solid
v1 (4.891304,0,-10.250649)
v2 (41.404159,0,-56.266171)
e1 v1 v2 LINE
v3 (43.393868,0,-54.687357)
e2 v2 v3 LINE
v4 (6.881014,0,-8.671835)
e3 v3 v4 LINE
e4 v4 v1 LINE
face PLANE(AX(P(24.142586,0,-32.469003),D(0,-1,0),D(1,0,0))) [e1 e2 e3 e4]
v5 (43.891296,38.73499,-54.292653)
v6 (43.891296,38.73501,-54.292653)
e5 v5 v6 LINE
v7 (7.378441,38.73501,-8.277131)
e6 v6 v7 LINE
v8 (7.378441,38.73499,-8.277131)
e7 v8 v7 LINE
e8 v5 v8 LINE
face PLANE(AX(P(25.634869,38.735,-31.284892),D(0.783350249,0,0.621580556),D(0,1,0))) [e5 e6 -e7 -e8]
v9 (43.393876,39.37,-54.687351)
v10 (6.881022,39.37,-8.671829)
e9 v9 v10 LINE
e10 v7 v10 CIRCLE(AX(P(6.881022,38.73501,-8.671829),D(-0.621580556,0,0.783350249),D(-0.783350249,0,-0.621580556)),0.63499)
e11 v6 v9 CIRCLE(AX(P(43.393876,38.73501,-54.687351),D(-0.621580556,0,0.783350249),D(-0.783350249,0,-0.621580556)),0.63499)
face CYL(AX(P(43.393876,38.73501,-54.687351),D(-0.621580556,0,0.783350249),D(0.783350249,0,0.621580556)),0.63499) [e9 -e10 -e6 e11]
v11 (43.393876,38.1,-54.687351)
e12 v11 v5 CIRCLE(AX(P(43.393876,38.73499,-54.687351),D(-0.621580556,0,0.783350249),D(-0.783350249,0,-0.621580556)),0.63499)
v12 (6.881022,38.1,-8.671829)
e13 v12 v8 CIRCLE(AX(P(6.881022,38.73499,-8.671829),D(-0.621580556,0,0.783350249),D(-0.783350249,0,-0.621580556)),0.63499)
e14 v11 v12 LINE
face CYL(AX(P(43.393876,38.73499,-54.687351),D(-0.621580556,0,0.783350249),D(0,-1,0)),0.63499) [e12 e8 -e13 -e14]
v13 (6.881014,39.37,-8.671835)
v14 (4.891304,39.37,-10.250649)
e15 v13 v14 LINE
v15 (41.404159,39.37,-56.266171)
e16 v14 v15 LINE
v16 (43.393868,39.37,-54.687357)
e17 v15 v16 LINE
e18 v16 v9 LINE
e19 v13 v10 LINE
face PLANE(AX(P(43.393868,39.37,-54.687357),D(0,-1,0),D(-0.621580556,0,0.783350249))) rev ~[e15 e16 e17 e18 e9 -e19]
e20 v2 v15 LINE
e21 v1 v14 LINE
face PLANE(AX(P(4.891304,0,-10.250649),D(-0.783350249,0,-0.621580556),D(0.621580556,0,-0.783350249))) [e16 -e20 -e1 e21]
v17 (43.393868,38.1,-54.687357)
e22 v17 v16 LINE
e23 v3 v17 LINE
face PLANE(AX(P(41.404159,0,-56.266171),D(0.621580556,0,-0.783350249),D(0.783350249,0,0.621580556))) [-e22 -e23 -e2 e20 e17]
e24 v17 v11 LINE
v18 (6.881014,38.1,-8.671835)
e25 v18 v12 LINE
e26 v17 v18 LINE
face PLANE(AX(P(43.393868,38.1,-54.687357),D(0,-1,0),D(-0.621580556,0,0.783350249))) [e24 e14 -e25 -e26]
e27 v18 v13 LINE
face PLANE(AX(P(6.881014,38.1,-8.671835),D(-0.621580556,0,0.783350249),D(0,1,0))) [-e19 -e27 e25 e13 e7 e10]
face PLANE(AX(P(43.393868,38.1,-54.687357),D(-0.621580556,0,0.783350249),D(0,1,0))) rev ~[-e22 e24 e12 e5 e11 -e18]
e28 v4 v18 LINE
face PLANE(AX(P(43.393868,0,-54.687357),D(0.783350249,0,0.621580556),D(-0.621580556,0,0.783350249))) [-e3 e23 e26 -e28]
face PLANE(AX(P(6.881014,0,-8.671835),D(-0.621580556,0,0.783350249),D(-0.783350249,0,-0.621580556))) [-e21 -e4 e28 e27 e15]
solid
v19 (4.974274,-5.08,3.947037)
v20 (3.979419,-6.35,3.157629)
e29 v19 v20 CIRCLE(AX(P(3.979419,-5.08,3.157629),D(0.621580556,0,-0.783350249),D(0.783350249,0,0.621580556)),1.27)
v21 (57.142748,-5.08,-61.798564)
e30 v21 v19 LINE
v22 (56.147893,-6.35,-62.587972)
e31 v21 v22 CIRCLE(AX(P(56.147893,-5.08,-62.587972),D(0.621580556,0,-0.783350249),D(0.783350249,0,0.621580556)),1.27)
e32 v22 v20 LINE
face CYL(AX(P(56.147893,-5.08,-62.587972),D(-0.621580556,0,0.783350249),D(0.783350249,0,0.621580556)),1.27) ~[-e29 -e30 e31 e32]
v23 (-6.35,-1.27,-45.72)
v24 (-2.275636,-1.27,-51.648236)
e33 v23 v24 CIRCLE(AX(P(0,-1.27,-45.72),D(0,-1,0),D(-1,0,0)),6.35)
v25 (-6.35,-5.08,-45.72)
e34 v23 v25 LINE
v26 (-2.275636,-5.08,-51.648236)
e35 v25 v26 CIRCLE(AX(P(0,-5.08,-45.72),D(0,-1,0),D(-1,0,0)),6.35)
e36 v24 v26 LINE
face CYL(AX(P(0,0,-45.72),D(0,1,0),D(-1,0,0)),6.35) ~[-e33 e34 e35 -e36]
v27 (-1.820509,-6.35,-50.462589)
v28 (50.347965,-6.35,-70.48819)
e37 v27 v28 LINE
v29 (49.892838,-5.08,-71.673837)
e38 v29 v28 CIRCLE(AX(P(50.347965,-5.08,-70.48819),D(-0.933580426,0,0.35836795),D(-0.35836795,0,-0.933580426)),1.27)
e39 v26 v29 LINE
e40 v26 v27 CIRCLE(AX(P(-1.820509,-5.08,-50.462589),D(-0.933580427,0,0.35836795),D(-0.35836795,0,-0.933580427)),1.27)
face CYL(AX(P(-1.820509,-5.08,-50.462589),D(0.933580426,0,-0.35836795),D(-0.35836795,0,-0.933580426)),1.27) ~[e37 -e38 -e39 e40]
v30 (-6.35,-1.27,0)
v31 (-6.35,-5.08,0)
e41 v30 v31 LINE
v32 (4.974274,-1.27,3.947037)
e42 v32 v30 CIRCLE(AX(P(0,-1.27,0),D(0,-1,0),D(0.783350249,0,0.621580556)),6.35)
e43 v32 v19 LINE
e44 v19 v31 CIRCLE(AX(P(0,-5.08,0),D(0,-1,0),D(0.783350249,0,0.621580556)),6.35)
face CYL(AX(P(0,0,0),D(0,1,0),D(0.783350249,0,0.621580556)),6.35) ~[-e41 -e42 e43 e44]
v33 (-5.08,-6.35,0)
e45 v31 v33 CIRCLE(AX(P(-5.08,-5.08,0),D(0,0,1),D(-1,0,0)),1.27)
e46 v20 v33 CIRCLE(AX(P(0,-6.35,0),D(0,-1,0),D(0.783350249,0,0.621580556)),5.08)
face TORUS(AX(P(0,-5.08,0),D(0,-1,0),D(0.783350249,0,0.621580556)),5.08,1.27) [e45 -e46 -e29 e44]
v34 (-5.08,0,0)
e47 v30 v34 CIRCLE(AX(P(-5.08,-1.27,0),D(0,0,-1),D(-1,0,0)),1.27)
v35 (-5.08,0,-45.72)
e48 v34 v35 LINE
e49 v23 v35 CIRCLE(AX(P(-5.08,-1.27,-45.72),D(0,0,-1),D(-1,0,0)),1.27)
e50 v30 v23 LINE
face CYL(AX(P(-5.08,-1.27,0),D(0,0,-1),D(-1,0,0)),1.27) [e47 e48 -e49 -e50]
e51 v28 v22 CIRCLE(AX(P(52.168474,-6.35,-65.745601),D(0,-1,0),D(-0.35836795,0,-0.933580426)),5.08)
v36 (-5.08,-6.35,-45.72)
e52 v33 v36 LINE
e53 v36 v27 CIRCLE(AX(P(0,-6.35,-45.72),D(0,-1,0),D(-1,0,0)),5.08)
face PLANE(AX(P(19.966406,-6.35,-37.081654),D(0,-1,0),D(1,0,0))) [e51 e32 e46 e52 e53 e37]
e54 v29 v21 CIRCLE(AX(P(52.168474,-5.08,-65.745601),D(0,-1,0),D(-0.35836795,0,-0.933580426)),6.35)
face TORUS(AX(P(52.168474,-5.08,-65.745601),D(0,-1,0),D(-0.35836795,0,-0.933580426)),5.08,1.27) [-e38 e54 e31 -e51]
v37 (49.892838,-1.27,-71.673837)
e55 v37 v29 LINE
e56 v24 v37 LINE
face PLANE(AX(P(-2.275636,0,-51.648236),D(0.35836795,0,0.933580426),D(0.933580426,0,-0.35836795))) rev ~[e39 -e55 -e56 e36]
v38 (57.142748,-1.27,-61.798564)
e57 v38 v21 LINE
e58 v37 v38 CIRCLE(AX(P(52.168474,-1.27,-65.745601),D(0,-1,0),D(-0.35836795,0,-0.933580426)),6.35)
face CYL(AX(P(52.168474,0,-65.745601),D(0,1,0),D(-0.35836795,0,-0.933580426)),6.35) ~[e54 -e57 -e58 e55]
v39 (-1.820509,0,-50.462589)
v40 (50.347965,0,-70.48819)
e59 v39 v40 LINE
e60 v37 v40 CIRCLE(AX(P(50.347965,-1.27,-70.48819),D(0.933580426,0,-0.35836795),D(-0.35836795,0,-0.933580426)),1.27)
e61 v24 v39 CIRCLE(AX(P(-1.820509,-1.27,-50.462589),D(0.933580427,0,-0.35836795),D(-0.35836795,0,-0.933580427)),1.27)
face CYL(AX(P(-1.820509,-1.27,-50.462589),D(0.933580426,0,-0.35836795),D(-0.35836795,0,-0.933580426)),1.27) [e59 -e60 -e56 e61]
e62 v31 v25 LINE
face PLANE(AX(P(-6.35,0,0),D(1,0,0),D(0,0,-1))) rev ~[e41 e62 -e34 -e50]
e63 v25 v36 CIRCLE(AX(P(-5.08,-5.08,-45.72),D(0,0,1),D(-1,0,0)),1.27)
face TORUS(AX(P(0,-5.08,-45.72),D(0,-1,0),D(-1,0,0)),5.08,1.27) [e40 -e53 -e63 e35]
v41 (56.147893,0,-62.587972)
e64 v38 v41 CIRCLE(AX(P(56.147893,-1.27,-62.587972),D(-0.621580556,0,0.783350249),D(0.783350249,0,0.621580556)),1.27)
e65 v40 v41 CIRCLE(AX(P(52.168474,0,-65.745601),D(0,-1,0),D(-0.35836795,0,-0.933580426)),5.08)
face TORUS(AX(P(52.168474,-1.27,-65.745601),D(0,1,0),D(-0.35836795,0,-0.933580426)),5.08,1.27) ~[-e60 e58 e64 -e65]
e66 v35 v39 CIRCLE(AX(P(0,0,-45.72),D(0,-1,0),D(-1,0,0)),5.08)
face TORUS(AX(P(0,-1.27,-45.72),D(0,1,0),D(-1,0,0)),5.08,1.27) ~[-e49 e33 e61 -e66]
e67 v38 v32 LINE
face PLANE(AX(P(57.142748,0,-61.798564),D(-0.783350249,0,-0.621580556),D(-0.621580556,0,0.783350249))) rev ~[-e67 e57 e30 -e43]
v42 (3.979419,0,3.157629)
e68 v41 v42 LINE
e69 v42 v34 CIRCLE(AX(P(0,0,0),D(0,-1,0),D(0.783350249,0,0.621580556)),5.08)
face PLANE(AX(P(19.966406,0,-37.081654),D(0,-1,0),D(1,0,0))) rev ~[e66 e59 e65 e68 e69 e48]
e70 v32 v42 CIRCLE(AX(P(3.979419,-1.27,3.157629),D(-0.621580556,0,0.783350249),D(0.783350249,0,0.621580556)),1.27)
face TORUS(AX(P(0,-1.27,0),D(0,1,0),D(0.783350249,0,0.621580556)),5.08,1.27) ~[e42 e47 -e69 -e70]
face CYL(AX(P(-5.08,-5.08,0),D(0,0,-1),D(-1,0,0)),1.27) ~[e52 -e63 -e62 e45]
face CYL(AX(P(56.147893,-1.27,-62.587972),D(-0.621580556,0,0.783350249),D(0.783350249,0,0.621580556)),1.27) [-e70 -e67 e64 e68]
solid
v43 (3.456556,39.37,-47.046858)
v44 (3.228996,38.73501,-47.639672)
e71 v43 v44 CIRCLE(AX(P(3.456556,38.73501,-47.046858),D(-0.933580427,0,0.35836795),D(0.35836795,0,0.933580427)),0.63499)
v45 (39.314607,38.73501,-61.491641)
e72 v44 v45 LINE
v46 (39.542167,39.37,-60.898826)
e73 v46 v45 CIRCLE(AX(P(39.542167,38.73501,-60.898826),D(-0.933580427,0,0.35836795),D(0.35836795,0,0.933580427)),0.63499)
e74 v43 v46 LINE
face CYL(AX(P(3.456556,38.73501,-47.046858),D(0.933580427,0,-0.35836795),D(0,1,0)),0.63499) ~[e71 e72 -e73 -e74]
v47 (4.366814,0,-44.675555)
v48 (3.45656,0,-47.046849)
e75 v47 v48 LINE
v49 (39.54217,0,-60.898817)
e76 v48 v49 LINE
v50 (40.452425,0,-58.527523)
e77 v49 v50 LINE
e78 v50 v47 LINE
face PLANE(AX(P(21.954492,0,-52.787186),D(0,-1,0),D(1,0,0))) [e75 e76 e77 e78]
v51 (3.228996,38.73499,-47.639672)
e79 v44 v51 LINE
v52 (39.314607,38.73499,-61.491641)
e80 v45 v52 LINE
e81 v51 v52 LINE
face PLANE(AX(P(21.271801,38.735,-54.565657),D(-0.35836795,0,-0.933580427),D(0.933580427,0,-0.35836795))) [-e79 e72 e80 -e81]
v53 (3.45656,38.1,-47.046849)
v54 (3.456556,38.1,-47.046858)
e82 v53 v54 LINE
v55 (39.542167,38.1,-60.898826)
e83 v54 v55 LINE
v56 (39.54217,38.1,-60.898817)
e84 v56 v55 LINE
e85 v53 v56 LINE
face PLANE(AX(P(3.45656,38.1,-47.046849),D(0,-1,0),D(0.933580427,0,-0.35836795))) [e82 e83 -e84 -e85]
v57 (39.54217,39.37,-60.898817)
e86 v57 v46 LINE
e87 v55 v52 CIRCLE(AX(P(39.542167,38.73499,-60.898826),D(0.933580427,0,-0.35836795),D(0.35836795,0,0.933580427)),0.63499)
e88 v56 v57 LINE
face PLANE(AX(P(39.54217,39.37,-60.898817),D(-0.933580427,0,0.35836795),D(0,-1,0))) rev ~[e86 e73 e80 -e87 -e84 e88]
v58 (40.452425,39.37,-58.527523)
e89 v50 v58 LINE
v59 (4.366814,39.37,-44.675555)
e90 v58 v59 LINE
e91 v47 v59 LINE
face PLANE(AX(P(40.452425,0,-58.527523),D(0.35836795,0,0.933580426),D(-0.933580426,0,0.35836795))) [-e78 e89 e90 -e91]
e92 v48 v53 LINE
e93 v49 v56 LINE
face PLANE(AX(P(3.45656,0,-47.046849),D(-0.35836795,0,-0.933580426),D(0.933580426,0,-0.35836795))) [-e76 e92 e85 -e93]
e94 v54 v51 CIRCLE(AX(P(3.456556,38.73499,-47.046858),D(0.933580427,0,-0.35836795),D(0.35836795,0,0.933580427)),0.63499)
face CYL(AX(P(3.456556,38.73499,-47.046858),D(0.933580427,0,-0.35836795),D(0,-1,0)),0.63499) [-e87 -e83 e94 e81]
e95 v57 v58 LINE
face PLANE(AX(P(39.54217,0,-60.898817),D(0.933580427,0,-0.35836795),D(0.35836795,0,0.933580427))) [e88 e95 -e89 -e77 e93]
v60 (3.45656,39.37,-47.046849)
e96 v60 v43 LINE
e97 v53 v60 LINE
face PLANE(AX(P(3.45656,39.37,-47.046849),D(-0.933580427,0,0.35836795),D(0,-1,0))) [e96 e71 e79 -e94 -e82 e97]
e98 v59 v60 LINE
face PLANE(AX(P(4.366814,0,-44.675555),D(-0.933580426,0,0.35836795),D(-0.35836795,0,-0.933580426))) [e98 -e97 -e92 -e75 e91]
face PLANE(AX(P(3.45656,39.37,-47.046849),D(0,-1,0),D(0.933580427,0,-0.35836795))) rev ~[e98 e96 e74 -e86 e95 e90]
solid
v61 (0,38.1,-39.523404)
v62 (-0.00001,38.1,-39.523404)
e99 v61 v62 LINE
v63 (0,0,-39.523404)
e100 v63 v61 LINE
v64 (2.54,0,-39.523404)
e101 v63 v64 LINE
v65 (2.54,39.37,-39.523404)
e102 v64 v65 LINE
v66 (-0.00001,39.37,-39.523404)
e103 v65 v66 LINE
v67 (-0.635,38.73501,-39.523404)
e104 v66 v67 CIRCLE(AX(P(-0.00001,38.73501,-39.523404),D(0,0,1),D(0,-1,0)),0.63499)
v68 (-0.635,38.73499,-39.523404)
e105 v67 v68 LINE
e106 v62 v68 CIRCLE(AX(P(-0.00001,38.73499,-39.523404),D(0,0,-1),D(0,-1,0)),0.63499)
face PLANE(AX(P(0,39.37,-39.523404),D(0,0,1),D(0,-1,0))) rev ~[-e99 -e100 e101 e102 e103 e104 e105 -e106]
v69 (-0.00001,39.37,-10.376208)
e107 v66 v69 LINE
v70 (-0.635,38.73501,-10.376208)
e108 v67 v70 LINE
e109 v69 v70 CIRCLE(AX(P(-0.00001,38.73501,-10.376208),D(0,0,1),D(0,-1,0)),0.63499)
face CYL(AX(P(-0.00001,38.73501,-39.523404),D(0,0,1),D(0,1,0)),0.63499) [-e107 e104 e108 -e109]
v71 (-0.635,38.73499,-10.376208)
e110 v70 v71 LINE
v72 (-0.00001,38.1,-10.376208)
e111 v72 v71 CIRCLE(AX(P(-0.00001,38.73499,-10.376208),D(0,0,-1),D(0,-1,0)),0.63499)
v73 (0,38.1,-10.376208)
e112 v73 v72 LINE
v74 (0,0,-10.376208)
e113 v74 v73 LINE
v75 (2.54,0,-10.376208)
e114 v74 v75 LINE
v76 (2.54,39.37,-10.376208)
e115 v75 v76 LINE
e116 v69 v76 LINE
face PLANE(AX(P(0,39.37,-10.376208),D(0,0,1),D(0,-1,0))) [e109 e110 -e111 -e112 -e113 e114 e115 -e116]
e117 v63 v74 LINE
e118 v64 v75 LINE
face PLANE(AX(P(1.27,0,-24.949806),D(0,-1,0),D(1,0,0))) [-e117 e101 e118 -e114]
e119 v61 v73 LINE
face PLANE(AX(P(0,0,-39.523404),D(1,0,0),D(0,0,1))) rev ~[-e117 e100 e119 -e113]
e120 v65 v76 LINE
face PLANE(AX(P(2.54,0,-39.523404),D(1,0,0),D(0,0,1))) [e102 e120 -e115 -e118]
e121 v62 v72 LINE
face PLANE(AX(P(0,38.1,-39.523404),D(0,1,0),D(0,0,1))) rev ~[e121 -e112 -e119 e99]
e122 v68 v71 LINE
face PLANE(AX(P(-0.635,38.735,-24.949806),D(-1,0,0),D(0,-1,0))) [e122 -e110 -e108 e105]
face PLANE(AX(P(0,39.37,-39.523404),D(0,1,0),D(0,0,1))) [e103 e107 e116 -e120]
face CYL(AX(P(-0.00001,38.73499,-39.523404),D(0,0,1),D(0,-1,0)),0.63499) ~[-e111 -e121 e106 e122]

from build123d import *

# Parameters (mm, degrees)
F0_W      = 2.54
F0_H      = 29.1471965611
F1_DEPTH  = 6.35
F2_DEPTH  = 39.37
F3_W      = 1.27
F3_H      = 58.7419511778
F4_DEPTH  = 0.635
F5_R      = 0.63499
F6_W      = 38.6529213808
F6_H      = 1.27
F7_DEPTH  = 0.635
F8_R      = 0.63499
F9_W      = 1.27
F9_H      = 29.1471965611
F10_DEPTH = 0.635
F11_R     = 0.63499
F12_R     = 1.27


# Not quite as in the source:
# - a fillet or chamfer is up to 0.001 mm smaller than in the source, because OpenCascade refuses the exact size


with BuildPart() as f1:
    # F0 (on Front) → F1 (new body)
    with BuildSketch(Plane.XZ):
        with BuildLine():
            Line((57.1427482982, -61.7985644783), (4.9742740829, 3.9470365205))
            ThreePointArc((4.9742740829, 3.9470365205), (-2.0899592777, 5.9962129759), (-6.3499999957, -1.22e-08))
            Line((-6.3499999957, -1.22e-08), (-6.3499999957, -45.7199999971))
            ThreePointArc((-6.3499999957, -45.7199999971), (-5.2332012935, -49.3166796015), (-2.2756364753, -51.6482357053))
            Line((-2.2756364754, -51.6482357053), (49.89283774, -71.6738367193))
            ThreePointArc((49.89283774, -71.6738367193), (57.2871568315, -69.5034711949), (57.1427482982, -61.7985644783))
        make_face()
        Polygon((0, -10.3762075305), (0, 0), (6.8810137765, -8.6718347243), (43.39386847, -54.6873567827), (52.1684742327, -65.7456010206), (39.5421703506, -60.8988170648), (3.4565595225, -47.0468488857), (0, -45.72), (0, -39.5234040916), align=None, mode=Mode.SUBTRACT)
        Polygon((6.8810137765, -8.6718347243), (0, 0), (0, -10.3762075305), (2.54, -10.3762075305), (2.54, -39.5234040916), (0, -39.5234040916), (0, -45.72), (3.4565595225, -47.0468488857), (4.3668141144, -44.6755546023), (40.4524249424, -58.5275227815), (39.5421703506, -60.8988170648), (52.1684742327, -65.7456010206), (43.39386847, -54.6873567827), (41.4041588386, -56.2661713958), (4.891304145, -10.2506493374), align=None)
        with Locations((1.27, -24.949805811)):
            Rectangle(F0_W, F0_H)
        Polygon((43.39386847, -54.6873567827), (6.8810137765, -8.6718347243), (4.891304145, -10.2506493374), (41.4041588386, -56.2661713958), align=None)
        Polygon((4.3668141144, -44.6755546023), (3.4565595225, -47.0468488857), (39.5421703506, -60.8988170648), (40.4524249424, -58.5275227815), align=None)
    extrude(amount=F1_DEPTH)

    # F12
    f12_edges = [f1.edges().sort_by_distance(p)[0] for p in [
        (-6.35, -6.35, -22.86),
        (-6.35, 0, -22.86),
    ]]
    fillet(f12_edges, radius=F12_R)


with BuildPart() as f2:
    # F0 (on Front) → F2 (new body)
    with BuildSketch(Plane.XZ):
        with Locations((1.27, -24.949805811)):
            Rectangle(F0_W, F0_H)
    extrude(amount=-F2_DEPTH)

    # F9 (on face) → F10 (join)
    with BuildSketch(Plane(origin=(0, 0, 0), x_dir=(0, -1, 0), z_dir=(-1, 0, 0))):
        with Locations((-38.735, -24.949805811)):
            Rectangle(F9_W, F9_H)
    extrude(amount=F10_DEPTH)

    # F11 (radius 0.635 in the source; OpenCascade refuses exactly that, so slightly less here)
    f11_edges = [f2.edges().sort_by_distance(p)[0] for p in [
        (-0.635, 38.1, -24.949806),
        (-0.635, 39.37, -24.949806),
    ]]
    fillet(f11_edges, radius=F11_R)


with BuildPart() as f2b:
    # F0 (on Front) → F2, piece 2 (new body)
    with BuildSketch(Plane.XZ):
        Polygon((4.3668141144, -44.6755546023), (3.4565595225, -47.0468488857), (39.5421703506, -60.8988170648), (40.4524249424, -58.5275227815), align=None)
    extrude(amount=-F2_DEPTH)

    # F6 (on face) → F7 (join)
    with BuildSketch(Plane(origin=(-15.2963256614, 0, -39.8482907104), x_dir=(0.9335804265, 0, -0.3583679495), z_dir=(-0.3583679495, 0, -0.9335804265))):
        with Locations((39.4135197714, -38.735)):
            Rectangle(F6_W, F6_H)
    extrude(amount=F7_DEPTH)

    # F8 (radius 0.635 in the source; OpenCascade refuses exactly that, so slightly less here)
    f8_edges = [f2b.edges().sort_by_distance(p)[0] for p in [
        (21.271801, 38.1, -54.565657),
        (21.271801, 39.37, -54.565657),
    ]]
    fillet(f8_edges, radius=F8_R)


with BuildPart() as f2c:
    # F0 (on Front) → F2, piece 3 (new body)
    with BuildSketch(Plane.XZ):
        Polygon((43.39386847, -54.6873567827), (6.8810137765, -8.6718347243), (4.891304145, -10.2506493374), (41.4041588386, -56.2661713958), align=None)
    extrude(amount=-F2_DEPTH)

    # F3 (on face) → F4 (join)
    with BuildSketch(Plane(origin=(0, 0, 0), x_dir=(0, 1, 0), z_dir=(0.7833502486, 0, 0.6215805563))):
        with Locations((38.735, -40.4411638473)):
            Rectangle(F3_W, F3_H)
    extrude(amount=F4_DEPTH)

    # F5 (radius 0.635 in the source; OpenCascade refuses exactly that, so slightly less here)
    f5_edges = [f2c.edges().sort_by_distance(p)[0] for p in [
        (25.634869, 38.1, -31.284892),
        (25.634869, 39.37, -31.284892),
    ]]
    fillet(f5_edges, radius=F5_R)


solid = Compound([f1.part, f2.part, f2b.part, f2c.part])
